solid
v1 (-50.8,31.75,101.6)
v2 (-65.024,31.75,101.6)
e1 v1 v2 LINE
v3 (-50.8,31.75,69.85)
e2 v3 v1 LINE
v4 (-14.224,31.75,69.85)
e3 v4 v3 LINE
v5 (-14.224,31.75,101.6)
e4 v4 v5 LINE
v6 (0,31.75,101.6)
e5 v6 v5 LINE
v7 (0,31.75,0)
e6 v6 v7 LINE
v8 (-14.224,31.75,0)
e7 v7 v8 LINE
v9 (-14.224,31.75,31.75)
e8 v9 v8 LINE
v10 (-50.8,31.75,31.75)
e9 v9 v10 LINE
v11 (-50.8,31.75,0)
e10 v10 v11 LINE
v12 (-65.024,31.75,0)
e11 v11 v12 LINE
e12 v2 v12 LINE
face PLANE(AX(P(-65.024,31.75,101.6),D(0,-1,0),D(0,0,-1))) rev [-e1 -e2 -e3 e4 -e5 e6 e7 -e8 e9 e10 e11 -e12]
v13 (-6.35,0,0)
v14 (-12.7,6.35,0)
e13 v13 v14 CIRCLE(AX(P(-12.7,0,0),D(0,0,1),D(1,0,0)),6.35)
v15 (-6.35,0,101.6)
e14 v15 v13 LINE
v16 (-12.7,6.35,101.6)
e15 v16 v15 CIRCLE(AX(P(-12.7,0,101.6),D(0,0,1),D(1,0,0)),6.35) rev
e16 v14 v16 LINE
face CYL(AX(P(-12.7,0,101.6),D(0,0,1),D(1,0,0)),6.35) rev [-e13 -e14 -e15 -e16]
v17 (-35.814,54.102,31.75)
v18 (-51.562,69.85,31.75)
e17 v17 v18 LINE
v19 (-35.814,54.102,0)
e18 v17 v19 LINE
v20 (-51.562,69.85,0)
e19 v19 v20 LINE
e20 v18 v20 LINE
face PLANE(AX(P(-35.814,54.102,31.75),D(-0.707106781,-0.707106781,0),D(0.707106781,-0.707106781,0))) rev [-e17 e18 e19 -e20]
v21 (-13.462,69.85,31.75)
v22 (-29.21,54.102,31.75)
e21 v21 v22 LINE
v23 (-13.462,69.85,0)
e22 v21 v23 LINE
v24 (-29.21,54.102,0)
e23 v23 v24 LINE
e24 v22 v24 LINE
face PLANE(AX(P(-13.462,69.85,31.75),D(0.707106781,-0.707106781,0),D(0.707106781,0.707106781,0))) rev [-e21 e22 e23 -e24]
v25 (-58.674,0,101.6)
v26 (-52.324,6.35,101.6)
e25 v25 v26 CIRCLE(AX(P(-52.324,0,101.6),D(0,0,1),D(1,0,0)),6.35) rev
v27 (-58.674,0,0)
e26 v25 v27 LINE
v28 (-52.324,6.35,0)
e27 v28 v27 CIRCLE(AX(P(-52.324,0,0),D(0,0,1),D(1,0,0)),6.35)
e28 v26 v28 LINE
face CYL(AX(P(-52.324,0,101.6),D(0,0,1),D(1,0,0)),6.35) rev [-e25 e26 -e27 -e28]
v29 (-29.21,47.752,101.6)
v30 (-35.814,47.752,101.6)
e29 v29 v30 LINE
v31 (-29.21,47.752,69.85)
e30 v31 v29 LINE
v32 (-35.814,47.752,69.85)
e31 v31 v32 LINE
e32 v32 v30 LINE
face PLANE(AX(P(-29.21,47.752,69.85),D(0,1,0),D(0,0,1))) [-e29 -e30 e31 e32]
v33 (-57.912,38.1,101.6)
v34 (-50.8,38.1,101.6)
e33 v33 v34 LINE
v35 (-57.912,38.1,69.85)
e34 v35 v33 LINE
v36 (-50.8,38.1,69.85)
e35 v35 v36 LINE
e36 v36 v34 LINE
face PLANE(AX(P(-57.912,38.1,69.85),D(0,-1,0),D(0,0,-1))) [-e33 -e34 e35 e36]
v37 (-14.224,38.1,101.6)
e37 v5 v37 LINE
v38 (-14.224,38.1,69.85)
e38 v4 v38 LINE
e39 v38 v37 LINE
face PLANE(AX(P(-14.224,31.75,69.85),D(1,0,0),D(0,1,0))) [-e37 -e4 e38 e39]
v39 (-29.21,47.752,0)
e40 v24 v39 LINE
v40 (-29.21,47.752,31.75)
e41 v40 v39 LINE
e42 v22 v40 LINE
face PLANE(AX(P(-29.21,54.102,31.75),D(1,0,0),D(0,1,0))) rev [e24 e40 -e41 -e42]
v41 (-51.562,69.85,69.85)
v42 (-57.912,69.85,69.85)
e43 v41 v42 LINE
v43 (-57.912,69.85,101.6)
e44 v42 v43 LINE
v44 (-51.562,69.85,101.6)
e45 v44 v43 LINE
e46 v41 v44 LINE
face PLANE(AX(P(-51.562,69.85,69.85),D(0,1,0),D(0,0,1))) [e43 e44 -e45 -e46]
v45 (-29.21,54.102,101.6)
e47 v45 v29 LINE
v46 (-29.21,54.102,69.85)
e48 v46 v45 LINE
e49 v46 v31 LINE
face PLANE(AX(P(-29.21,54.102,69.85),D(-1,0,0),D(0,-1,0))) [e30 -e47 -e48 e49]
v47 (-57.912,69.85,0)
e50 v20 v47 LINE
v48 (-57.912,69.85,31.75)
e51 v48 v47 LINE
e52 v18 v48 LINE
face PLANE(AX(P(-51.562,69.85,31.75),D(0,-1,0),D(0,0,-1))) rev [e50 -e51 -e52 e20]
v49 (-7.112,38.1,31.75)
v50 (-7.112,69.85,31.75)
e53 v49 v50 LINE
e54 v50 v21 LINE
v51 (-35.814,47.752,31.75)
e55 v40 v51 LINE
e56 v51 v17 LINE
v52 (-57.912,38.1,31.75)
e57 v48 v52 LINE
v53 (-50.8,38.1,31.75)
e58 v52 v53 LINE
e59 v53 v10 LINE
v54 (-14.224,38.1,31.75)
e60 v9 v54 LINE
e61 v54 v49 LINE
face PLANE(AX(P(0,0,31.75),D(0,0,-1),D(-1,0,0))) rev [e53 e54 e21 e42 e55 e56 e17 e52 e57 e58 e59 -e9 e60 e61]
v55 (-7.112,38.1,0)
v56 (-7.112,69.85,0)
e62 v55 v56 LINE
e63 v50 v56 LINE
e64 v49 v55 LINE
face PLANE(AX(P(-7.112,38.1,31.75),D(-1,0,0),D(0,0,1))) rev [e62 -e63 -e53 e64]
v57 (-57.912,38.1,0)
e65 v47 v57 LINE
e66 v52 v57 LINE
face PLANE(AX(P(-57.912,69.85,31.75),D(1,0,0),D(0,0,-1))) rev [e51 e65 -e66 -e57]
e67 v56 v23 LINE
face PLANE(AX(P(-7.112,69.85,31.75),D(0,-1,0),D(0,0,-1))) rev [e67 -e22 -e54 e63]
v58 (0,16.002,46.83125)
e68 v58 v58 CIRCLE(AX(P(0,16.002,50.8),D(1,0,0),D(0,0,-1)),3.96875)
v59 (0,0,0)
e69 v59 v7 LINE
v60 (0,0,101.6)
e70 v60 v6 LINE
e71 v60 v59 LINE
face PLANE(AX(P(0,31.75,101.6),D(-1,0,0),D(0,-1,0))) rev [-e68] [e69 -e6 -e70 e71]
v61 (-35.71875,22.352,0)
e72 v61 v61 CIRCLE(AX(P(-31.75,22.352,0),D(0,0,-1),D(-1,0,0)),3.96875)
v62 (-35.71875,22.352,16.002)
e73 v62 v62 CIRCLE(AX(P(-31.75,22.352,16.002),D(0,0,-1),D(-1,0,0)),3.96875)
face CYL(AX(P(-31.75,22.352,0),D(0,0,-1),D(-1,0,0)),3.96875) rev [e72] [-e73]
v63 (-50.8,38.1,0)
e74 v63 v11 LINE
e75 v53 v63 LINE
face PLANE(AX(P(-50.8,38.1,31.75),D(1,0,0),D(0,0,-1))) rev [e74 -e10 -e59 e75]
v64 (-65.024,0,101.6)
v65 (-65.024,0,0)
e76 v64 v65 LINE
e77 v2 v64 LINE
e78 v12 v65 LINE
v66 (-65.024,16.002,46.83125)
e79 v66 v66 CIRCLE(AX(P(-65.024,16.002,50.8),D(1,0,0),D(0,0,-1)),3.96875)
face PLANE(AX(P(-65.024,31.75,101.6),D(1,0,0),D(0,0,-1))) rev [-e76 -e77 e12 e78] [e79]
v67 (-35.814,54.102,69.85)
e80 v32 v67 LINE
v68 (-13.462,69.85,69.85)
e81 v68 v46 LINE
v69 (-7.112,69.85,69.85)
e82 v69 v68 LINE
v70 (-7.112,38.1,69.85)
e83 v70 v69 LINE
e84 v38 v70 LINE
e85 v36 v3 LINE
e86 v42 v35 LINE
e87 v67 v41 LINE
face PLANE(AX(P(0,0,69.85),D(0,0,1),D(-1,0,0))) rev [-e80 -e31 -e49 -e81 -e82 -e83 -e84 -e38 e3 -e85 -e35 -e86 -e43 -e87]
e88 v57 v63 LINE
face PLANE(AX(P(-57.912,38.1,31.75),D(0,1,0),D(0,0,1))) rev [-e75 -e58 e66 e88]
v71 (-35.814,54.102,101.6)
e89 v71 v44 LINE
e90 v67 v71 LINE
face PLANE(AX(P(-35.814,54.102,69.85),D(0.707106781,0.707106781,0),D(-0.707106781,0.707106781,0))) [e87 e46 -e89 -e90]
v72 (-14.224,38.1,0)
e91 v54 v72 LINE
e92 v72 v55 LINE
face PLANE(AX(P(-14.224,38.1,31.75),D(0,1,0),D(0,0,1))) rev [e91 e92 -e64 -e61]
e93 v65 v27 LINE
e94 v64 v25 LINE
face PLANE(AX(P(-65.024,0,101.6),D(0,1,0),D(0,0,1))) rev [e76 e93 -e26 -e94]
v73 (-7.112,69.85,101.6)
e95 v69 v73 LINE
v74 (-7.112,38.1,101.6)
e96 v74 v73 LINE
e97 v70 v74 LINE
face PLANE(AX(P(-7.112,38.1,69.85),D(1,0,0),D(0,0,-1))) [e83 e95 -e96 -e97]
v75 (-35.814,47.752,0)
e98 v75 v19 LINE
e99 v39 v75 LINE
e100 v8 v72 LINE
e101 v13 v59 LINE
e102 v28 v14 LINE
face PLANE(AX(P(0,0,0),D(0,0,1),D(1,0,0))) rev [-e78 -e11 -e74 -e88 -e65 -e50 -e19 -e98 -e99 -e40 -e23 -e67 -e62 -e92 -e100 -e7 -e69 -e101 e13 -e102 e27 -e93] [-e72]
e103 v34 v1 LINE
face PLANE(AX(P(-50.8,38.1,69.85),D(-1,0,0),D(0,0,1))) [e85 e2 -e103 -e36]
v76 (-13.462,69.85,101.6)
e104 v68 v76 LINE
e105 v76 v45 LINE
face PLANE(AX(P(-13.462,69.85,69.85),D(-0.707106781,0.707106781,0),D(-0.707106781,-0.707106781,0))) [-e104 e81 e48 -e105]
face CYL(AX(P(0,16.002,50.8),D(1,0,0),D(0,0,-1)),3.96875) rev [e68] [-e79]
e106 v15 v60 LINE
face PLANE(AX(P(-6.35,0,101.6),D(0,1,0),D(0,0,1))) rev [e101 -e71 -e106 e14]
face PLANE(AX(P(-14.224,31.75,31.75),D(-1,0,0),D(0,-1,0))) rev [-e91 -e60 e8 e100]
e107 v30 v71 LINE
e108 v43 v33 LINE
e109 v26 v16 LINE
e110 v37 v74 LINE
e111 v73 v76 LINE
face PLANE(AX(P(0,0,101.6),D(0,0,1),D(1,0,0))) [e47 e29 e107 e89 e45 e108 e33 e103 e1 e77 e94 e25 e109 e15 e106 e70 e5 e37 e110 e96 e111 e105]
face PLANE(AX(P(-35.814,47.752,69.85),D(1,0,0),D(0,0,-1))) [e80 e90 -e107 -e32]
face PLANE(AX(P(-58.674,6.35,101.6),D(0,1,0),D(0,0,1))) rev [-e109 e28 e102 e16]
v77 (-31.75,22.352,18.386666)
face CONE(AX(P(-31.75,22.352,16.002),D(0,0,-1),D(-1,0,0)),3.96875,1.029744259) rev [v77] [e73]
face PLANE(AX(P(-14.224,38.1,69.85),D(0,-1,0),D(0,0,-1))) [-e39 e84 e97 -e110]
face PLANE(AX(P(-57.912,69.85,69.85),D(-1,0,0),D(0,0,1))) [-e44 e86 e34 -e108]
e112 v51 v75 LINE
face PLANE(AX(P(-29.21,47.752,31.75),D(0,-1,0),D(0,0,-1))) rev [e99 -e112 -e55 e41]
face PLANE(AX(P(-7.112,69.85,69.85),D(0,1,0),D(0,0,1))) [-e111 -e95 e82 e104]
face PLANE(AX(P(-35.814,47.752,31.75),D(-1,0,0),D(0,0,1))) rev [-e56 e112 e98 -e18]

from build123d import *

# Parameters (mm, degrees)
BOSS_EXTRUDE1_DEPTH         = 101.6
FILLET1_R                   = 6.35
FILLET2_R                   = 6.35
F_3_8_16_TAPPED_HOLE3_D     = 7.9375
F_3_8_16_TAPPED_HOLE3_DEPTH = 16.002
F_3_8_16_TAPPED_HOLE3_TIP   = 2.384665582
F_3_8_16_TAPPED_HOLE4_D     = 7.9375
BOSS_EXTRUDE2_DEPTH         = 31.75


with BuildPart() as part:
    # Sketch1 → Boss-Extrude1 (new body)
    with BuildSketch(Plane.XY):
        Polygon((-58.674, 0), (-58.674, 6.35), (-6.35, 6.35), (-6.35, 0), (0, 0), (0, 31.75), (-65.024, 31.75), (-65.024, 0), align=None)
    extrude(amount=BOSS_EXTRUDE1_DEPTH)

    # Fillet1
    fillet1_edges = [part.edges().sort_by_distance(p)[0] for p in [
        (-6.35, 6.35, 50.8),
    ]]
    fillet(fillet1_edges, radius=FILLET1_R - 0.0001)  # a hair under: the kernel refuses the full size

    # Fillet2
    fillet2_edges = [part.edges().sort_by_distance(p)[0] for p in [
        (-58.674, 6.35, 50.8),
    ]]
    fillet(fillet2_edges, radius=FILLET2_R - 0.0001)  # a hair under: the kernel refuses the full size

    # 3/8-16 Tapped Hole3
    with Locations(Plane(origin=(0, 0, 0), x_dir=(-1, 0, 0), z_dir=(0, 0, -1))):
        with Locations((31.75, 22.352)):
            Hole(F_3_8_16_TAPPED_HOLE3_D / 2, depth=F_3_8_16_TAPPED_HOLE3_DEPTH)
            with Locations((0, 0, -(F_3_8_16_TAPPED_HOLE3_DEPTH + F_3_8_16_TAPPED_HOLE3_TIP / 2))):  # 118° drill point
                Cone(0, F_3_8_16_TAPPED_HOLE3_D / 2, F_3_8_16_TAPPED_HOLE3_TIP, mode=Mode.SUBTRACT)

    # 3/8-16 Tapped Hole4 (through all)
    with Locations(Plane(origin=(0, 0, 0), x_dir=(0, 0, -1), z_dir=(1, 0, 0))):
        with Locations((-50.8, 16.002)):
            Hole(F_3_8_16_TAPPED_HOLE4_D / 2)

    # Sketch13 → Boss-Extrude2 (add)
    with BuildSketch(Plane.XY):
        Polygon((-14.224, 31.75), (-14.224, 38.1), (-7.112, 38.1), (-7.112, 69.85), (-13.462, 69.85), (-29.21, 54.102), (-29.21, 47.752), (-35.814, 47.752), (-35.814, 54.102), (-51.562, 69.85), (-57.912, 69.85), (-57.912, 38.1), (-50.8, 38.1), (-50.8, 31.75), align=None)
    boss_extrude2 = extrude(amount=BOSS_EXTRUDE2_DEPTH)

    # Mirror1: Boss-Extrude2 across plane
    add(boss_extrude2.mirror(Plane.XY.offset(50.8)))


solid = part.part
